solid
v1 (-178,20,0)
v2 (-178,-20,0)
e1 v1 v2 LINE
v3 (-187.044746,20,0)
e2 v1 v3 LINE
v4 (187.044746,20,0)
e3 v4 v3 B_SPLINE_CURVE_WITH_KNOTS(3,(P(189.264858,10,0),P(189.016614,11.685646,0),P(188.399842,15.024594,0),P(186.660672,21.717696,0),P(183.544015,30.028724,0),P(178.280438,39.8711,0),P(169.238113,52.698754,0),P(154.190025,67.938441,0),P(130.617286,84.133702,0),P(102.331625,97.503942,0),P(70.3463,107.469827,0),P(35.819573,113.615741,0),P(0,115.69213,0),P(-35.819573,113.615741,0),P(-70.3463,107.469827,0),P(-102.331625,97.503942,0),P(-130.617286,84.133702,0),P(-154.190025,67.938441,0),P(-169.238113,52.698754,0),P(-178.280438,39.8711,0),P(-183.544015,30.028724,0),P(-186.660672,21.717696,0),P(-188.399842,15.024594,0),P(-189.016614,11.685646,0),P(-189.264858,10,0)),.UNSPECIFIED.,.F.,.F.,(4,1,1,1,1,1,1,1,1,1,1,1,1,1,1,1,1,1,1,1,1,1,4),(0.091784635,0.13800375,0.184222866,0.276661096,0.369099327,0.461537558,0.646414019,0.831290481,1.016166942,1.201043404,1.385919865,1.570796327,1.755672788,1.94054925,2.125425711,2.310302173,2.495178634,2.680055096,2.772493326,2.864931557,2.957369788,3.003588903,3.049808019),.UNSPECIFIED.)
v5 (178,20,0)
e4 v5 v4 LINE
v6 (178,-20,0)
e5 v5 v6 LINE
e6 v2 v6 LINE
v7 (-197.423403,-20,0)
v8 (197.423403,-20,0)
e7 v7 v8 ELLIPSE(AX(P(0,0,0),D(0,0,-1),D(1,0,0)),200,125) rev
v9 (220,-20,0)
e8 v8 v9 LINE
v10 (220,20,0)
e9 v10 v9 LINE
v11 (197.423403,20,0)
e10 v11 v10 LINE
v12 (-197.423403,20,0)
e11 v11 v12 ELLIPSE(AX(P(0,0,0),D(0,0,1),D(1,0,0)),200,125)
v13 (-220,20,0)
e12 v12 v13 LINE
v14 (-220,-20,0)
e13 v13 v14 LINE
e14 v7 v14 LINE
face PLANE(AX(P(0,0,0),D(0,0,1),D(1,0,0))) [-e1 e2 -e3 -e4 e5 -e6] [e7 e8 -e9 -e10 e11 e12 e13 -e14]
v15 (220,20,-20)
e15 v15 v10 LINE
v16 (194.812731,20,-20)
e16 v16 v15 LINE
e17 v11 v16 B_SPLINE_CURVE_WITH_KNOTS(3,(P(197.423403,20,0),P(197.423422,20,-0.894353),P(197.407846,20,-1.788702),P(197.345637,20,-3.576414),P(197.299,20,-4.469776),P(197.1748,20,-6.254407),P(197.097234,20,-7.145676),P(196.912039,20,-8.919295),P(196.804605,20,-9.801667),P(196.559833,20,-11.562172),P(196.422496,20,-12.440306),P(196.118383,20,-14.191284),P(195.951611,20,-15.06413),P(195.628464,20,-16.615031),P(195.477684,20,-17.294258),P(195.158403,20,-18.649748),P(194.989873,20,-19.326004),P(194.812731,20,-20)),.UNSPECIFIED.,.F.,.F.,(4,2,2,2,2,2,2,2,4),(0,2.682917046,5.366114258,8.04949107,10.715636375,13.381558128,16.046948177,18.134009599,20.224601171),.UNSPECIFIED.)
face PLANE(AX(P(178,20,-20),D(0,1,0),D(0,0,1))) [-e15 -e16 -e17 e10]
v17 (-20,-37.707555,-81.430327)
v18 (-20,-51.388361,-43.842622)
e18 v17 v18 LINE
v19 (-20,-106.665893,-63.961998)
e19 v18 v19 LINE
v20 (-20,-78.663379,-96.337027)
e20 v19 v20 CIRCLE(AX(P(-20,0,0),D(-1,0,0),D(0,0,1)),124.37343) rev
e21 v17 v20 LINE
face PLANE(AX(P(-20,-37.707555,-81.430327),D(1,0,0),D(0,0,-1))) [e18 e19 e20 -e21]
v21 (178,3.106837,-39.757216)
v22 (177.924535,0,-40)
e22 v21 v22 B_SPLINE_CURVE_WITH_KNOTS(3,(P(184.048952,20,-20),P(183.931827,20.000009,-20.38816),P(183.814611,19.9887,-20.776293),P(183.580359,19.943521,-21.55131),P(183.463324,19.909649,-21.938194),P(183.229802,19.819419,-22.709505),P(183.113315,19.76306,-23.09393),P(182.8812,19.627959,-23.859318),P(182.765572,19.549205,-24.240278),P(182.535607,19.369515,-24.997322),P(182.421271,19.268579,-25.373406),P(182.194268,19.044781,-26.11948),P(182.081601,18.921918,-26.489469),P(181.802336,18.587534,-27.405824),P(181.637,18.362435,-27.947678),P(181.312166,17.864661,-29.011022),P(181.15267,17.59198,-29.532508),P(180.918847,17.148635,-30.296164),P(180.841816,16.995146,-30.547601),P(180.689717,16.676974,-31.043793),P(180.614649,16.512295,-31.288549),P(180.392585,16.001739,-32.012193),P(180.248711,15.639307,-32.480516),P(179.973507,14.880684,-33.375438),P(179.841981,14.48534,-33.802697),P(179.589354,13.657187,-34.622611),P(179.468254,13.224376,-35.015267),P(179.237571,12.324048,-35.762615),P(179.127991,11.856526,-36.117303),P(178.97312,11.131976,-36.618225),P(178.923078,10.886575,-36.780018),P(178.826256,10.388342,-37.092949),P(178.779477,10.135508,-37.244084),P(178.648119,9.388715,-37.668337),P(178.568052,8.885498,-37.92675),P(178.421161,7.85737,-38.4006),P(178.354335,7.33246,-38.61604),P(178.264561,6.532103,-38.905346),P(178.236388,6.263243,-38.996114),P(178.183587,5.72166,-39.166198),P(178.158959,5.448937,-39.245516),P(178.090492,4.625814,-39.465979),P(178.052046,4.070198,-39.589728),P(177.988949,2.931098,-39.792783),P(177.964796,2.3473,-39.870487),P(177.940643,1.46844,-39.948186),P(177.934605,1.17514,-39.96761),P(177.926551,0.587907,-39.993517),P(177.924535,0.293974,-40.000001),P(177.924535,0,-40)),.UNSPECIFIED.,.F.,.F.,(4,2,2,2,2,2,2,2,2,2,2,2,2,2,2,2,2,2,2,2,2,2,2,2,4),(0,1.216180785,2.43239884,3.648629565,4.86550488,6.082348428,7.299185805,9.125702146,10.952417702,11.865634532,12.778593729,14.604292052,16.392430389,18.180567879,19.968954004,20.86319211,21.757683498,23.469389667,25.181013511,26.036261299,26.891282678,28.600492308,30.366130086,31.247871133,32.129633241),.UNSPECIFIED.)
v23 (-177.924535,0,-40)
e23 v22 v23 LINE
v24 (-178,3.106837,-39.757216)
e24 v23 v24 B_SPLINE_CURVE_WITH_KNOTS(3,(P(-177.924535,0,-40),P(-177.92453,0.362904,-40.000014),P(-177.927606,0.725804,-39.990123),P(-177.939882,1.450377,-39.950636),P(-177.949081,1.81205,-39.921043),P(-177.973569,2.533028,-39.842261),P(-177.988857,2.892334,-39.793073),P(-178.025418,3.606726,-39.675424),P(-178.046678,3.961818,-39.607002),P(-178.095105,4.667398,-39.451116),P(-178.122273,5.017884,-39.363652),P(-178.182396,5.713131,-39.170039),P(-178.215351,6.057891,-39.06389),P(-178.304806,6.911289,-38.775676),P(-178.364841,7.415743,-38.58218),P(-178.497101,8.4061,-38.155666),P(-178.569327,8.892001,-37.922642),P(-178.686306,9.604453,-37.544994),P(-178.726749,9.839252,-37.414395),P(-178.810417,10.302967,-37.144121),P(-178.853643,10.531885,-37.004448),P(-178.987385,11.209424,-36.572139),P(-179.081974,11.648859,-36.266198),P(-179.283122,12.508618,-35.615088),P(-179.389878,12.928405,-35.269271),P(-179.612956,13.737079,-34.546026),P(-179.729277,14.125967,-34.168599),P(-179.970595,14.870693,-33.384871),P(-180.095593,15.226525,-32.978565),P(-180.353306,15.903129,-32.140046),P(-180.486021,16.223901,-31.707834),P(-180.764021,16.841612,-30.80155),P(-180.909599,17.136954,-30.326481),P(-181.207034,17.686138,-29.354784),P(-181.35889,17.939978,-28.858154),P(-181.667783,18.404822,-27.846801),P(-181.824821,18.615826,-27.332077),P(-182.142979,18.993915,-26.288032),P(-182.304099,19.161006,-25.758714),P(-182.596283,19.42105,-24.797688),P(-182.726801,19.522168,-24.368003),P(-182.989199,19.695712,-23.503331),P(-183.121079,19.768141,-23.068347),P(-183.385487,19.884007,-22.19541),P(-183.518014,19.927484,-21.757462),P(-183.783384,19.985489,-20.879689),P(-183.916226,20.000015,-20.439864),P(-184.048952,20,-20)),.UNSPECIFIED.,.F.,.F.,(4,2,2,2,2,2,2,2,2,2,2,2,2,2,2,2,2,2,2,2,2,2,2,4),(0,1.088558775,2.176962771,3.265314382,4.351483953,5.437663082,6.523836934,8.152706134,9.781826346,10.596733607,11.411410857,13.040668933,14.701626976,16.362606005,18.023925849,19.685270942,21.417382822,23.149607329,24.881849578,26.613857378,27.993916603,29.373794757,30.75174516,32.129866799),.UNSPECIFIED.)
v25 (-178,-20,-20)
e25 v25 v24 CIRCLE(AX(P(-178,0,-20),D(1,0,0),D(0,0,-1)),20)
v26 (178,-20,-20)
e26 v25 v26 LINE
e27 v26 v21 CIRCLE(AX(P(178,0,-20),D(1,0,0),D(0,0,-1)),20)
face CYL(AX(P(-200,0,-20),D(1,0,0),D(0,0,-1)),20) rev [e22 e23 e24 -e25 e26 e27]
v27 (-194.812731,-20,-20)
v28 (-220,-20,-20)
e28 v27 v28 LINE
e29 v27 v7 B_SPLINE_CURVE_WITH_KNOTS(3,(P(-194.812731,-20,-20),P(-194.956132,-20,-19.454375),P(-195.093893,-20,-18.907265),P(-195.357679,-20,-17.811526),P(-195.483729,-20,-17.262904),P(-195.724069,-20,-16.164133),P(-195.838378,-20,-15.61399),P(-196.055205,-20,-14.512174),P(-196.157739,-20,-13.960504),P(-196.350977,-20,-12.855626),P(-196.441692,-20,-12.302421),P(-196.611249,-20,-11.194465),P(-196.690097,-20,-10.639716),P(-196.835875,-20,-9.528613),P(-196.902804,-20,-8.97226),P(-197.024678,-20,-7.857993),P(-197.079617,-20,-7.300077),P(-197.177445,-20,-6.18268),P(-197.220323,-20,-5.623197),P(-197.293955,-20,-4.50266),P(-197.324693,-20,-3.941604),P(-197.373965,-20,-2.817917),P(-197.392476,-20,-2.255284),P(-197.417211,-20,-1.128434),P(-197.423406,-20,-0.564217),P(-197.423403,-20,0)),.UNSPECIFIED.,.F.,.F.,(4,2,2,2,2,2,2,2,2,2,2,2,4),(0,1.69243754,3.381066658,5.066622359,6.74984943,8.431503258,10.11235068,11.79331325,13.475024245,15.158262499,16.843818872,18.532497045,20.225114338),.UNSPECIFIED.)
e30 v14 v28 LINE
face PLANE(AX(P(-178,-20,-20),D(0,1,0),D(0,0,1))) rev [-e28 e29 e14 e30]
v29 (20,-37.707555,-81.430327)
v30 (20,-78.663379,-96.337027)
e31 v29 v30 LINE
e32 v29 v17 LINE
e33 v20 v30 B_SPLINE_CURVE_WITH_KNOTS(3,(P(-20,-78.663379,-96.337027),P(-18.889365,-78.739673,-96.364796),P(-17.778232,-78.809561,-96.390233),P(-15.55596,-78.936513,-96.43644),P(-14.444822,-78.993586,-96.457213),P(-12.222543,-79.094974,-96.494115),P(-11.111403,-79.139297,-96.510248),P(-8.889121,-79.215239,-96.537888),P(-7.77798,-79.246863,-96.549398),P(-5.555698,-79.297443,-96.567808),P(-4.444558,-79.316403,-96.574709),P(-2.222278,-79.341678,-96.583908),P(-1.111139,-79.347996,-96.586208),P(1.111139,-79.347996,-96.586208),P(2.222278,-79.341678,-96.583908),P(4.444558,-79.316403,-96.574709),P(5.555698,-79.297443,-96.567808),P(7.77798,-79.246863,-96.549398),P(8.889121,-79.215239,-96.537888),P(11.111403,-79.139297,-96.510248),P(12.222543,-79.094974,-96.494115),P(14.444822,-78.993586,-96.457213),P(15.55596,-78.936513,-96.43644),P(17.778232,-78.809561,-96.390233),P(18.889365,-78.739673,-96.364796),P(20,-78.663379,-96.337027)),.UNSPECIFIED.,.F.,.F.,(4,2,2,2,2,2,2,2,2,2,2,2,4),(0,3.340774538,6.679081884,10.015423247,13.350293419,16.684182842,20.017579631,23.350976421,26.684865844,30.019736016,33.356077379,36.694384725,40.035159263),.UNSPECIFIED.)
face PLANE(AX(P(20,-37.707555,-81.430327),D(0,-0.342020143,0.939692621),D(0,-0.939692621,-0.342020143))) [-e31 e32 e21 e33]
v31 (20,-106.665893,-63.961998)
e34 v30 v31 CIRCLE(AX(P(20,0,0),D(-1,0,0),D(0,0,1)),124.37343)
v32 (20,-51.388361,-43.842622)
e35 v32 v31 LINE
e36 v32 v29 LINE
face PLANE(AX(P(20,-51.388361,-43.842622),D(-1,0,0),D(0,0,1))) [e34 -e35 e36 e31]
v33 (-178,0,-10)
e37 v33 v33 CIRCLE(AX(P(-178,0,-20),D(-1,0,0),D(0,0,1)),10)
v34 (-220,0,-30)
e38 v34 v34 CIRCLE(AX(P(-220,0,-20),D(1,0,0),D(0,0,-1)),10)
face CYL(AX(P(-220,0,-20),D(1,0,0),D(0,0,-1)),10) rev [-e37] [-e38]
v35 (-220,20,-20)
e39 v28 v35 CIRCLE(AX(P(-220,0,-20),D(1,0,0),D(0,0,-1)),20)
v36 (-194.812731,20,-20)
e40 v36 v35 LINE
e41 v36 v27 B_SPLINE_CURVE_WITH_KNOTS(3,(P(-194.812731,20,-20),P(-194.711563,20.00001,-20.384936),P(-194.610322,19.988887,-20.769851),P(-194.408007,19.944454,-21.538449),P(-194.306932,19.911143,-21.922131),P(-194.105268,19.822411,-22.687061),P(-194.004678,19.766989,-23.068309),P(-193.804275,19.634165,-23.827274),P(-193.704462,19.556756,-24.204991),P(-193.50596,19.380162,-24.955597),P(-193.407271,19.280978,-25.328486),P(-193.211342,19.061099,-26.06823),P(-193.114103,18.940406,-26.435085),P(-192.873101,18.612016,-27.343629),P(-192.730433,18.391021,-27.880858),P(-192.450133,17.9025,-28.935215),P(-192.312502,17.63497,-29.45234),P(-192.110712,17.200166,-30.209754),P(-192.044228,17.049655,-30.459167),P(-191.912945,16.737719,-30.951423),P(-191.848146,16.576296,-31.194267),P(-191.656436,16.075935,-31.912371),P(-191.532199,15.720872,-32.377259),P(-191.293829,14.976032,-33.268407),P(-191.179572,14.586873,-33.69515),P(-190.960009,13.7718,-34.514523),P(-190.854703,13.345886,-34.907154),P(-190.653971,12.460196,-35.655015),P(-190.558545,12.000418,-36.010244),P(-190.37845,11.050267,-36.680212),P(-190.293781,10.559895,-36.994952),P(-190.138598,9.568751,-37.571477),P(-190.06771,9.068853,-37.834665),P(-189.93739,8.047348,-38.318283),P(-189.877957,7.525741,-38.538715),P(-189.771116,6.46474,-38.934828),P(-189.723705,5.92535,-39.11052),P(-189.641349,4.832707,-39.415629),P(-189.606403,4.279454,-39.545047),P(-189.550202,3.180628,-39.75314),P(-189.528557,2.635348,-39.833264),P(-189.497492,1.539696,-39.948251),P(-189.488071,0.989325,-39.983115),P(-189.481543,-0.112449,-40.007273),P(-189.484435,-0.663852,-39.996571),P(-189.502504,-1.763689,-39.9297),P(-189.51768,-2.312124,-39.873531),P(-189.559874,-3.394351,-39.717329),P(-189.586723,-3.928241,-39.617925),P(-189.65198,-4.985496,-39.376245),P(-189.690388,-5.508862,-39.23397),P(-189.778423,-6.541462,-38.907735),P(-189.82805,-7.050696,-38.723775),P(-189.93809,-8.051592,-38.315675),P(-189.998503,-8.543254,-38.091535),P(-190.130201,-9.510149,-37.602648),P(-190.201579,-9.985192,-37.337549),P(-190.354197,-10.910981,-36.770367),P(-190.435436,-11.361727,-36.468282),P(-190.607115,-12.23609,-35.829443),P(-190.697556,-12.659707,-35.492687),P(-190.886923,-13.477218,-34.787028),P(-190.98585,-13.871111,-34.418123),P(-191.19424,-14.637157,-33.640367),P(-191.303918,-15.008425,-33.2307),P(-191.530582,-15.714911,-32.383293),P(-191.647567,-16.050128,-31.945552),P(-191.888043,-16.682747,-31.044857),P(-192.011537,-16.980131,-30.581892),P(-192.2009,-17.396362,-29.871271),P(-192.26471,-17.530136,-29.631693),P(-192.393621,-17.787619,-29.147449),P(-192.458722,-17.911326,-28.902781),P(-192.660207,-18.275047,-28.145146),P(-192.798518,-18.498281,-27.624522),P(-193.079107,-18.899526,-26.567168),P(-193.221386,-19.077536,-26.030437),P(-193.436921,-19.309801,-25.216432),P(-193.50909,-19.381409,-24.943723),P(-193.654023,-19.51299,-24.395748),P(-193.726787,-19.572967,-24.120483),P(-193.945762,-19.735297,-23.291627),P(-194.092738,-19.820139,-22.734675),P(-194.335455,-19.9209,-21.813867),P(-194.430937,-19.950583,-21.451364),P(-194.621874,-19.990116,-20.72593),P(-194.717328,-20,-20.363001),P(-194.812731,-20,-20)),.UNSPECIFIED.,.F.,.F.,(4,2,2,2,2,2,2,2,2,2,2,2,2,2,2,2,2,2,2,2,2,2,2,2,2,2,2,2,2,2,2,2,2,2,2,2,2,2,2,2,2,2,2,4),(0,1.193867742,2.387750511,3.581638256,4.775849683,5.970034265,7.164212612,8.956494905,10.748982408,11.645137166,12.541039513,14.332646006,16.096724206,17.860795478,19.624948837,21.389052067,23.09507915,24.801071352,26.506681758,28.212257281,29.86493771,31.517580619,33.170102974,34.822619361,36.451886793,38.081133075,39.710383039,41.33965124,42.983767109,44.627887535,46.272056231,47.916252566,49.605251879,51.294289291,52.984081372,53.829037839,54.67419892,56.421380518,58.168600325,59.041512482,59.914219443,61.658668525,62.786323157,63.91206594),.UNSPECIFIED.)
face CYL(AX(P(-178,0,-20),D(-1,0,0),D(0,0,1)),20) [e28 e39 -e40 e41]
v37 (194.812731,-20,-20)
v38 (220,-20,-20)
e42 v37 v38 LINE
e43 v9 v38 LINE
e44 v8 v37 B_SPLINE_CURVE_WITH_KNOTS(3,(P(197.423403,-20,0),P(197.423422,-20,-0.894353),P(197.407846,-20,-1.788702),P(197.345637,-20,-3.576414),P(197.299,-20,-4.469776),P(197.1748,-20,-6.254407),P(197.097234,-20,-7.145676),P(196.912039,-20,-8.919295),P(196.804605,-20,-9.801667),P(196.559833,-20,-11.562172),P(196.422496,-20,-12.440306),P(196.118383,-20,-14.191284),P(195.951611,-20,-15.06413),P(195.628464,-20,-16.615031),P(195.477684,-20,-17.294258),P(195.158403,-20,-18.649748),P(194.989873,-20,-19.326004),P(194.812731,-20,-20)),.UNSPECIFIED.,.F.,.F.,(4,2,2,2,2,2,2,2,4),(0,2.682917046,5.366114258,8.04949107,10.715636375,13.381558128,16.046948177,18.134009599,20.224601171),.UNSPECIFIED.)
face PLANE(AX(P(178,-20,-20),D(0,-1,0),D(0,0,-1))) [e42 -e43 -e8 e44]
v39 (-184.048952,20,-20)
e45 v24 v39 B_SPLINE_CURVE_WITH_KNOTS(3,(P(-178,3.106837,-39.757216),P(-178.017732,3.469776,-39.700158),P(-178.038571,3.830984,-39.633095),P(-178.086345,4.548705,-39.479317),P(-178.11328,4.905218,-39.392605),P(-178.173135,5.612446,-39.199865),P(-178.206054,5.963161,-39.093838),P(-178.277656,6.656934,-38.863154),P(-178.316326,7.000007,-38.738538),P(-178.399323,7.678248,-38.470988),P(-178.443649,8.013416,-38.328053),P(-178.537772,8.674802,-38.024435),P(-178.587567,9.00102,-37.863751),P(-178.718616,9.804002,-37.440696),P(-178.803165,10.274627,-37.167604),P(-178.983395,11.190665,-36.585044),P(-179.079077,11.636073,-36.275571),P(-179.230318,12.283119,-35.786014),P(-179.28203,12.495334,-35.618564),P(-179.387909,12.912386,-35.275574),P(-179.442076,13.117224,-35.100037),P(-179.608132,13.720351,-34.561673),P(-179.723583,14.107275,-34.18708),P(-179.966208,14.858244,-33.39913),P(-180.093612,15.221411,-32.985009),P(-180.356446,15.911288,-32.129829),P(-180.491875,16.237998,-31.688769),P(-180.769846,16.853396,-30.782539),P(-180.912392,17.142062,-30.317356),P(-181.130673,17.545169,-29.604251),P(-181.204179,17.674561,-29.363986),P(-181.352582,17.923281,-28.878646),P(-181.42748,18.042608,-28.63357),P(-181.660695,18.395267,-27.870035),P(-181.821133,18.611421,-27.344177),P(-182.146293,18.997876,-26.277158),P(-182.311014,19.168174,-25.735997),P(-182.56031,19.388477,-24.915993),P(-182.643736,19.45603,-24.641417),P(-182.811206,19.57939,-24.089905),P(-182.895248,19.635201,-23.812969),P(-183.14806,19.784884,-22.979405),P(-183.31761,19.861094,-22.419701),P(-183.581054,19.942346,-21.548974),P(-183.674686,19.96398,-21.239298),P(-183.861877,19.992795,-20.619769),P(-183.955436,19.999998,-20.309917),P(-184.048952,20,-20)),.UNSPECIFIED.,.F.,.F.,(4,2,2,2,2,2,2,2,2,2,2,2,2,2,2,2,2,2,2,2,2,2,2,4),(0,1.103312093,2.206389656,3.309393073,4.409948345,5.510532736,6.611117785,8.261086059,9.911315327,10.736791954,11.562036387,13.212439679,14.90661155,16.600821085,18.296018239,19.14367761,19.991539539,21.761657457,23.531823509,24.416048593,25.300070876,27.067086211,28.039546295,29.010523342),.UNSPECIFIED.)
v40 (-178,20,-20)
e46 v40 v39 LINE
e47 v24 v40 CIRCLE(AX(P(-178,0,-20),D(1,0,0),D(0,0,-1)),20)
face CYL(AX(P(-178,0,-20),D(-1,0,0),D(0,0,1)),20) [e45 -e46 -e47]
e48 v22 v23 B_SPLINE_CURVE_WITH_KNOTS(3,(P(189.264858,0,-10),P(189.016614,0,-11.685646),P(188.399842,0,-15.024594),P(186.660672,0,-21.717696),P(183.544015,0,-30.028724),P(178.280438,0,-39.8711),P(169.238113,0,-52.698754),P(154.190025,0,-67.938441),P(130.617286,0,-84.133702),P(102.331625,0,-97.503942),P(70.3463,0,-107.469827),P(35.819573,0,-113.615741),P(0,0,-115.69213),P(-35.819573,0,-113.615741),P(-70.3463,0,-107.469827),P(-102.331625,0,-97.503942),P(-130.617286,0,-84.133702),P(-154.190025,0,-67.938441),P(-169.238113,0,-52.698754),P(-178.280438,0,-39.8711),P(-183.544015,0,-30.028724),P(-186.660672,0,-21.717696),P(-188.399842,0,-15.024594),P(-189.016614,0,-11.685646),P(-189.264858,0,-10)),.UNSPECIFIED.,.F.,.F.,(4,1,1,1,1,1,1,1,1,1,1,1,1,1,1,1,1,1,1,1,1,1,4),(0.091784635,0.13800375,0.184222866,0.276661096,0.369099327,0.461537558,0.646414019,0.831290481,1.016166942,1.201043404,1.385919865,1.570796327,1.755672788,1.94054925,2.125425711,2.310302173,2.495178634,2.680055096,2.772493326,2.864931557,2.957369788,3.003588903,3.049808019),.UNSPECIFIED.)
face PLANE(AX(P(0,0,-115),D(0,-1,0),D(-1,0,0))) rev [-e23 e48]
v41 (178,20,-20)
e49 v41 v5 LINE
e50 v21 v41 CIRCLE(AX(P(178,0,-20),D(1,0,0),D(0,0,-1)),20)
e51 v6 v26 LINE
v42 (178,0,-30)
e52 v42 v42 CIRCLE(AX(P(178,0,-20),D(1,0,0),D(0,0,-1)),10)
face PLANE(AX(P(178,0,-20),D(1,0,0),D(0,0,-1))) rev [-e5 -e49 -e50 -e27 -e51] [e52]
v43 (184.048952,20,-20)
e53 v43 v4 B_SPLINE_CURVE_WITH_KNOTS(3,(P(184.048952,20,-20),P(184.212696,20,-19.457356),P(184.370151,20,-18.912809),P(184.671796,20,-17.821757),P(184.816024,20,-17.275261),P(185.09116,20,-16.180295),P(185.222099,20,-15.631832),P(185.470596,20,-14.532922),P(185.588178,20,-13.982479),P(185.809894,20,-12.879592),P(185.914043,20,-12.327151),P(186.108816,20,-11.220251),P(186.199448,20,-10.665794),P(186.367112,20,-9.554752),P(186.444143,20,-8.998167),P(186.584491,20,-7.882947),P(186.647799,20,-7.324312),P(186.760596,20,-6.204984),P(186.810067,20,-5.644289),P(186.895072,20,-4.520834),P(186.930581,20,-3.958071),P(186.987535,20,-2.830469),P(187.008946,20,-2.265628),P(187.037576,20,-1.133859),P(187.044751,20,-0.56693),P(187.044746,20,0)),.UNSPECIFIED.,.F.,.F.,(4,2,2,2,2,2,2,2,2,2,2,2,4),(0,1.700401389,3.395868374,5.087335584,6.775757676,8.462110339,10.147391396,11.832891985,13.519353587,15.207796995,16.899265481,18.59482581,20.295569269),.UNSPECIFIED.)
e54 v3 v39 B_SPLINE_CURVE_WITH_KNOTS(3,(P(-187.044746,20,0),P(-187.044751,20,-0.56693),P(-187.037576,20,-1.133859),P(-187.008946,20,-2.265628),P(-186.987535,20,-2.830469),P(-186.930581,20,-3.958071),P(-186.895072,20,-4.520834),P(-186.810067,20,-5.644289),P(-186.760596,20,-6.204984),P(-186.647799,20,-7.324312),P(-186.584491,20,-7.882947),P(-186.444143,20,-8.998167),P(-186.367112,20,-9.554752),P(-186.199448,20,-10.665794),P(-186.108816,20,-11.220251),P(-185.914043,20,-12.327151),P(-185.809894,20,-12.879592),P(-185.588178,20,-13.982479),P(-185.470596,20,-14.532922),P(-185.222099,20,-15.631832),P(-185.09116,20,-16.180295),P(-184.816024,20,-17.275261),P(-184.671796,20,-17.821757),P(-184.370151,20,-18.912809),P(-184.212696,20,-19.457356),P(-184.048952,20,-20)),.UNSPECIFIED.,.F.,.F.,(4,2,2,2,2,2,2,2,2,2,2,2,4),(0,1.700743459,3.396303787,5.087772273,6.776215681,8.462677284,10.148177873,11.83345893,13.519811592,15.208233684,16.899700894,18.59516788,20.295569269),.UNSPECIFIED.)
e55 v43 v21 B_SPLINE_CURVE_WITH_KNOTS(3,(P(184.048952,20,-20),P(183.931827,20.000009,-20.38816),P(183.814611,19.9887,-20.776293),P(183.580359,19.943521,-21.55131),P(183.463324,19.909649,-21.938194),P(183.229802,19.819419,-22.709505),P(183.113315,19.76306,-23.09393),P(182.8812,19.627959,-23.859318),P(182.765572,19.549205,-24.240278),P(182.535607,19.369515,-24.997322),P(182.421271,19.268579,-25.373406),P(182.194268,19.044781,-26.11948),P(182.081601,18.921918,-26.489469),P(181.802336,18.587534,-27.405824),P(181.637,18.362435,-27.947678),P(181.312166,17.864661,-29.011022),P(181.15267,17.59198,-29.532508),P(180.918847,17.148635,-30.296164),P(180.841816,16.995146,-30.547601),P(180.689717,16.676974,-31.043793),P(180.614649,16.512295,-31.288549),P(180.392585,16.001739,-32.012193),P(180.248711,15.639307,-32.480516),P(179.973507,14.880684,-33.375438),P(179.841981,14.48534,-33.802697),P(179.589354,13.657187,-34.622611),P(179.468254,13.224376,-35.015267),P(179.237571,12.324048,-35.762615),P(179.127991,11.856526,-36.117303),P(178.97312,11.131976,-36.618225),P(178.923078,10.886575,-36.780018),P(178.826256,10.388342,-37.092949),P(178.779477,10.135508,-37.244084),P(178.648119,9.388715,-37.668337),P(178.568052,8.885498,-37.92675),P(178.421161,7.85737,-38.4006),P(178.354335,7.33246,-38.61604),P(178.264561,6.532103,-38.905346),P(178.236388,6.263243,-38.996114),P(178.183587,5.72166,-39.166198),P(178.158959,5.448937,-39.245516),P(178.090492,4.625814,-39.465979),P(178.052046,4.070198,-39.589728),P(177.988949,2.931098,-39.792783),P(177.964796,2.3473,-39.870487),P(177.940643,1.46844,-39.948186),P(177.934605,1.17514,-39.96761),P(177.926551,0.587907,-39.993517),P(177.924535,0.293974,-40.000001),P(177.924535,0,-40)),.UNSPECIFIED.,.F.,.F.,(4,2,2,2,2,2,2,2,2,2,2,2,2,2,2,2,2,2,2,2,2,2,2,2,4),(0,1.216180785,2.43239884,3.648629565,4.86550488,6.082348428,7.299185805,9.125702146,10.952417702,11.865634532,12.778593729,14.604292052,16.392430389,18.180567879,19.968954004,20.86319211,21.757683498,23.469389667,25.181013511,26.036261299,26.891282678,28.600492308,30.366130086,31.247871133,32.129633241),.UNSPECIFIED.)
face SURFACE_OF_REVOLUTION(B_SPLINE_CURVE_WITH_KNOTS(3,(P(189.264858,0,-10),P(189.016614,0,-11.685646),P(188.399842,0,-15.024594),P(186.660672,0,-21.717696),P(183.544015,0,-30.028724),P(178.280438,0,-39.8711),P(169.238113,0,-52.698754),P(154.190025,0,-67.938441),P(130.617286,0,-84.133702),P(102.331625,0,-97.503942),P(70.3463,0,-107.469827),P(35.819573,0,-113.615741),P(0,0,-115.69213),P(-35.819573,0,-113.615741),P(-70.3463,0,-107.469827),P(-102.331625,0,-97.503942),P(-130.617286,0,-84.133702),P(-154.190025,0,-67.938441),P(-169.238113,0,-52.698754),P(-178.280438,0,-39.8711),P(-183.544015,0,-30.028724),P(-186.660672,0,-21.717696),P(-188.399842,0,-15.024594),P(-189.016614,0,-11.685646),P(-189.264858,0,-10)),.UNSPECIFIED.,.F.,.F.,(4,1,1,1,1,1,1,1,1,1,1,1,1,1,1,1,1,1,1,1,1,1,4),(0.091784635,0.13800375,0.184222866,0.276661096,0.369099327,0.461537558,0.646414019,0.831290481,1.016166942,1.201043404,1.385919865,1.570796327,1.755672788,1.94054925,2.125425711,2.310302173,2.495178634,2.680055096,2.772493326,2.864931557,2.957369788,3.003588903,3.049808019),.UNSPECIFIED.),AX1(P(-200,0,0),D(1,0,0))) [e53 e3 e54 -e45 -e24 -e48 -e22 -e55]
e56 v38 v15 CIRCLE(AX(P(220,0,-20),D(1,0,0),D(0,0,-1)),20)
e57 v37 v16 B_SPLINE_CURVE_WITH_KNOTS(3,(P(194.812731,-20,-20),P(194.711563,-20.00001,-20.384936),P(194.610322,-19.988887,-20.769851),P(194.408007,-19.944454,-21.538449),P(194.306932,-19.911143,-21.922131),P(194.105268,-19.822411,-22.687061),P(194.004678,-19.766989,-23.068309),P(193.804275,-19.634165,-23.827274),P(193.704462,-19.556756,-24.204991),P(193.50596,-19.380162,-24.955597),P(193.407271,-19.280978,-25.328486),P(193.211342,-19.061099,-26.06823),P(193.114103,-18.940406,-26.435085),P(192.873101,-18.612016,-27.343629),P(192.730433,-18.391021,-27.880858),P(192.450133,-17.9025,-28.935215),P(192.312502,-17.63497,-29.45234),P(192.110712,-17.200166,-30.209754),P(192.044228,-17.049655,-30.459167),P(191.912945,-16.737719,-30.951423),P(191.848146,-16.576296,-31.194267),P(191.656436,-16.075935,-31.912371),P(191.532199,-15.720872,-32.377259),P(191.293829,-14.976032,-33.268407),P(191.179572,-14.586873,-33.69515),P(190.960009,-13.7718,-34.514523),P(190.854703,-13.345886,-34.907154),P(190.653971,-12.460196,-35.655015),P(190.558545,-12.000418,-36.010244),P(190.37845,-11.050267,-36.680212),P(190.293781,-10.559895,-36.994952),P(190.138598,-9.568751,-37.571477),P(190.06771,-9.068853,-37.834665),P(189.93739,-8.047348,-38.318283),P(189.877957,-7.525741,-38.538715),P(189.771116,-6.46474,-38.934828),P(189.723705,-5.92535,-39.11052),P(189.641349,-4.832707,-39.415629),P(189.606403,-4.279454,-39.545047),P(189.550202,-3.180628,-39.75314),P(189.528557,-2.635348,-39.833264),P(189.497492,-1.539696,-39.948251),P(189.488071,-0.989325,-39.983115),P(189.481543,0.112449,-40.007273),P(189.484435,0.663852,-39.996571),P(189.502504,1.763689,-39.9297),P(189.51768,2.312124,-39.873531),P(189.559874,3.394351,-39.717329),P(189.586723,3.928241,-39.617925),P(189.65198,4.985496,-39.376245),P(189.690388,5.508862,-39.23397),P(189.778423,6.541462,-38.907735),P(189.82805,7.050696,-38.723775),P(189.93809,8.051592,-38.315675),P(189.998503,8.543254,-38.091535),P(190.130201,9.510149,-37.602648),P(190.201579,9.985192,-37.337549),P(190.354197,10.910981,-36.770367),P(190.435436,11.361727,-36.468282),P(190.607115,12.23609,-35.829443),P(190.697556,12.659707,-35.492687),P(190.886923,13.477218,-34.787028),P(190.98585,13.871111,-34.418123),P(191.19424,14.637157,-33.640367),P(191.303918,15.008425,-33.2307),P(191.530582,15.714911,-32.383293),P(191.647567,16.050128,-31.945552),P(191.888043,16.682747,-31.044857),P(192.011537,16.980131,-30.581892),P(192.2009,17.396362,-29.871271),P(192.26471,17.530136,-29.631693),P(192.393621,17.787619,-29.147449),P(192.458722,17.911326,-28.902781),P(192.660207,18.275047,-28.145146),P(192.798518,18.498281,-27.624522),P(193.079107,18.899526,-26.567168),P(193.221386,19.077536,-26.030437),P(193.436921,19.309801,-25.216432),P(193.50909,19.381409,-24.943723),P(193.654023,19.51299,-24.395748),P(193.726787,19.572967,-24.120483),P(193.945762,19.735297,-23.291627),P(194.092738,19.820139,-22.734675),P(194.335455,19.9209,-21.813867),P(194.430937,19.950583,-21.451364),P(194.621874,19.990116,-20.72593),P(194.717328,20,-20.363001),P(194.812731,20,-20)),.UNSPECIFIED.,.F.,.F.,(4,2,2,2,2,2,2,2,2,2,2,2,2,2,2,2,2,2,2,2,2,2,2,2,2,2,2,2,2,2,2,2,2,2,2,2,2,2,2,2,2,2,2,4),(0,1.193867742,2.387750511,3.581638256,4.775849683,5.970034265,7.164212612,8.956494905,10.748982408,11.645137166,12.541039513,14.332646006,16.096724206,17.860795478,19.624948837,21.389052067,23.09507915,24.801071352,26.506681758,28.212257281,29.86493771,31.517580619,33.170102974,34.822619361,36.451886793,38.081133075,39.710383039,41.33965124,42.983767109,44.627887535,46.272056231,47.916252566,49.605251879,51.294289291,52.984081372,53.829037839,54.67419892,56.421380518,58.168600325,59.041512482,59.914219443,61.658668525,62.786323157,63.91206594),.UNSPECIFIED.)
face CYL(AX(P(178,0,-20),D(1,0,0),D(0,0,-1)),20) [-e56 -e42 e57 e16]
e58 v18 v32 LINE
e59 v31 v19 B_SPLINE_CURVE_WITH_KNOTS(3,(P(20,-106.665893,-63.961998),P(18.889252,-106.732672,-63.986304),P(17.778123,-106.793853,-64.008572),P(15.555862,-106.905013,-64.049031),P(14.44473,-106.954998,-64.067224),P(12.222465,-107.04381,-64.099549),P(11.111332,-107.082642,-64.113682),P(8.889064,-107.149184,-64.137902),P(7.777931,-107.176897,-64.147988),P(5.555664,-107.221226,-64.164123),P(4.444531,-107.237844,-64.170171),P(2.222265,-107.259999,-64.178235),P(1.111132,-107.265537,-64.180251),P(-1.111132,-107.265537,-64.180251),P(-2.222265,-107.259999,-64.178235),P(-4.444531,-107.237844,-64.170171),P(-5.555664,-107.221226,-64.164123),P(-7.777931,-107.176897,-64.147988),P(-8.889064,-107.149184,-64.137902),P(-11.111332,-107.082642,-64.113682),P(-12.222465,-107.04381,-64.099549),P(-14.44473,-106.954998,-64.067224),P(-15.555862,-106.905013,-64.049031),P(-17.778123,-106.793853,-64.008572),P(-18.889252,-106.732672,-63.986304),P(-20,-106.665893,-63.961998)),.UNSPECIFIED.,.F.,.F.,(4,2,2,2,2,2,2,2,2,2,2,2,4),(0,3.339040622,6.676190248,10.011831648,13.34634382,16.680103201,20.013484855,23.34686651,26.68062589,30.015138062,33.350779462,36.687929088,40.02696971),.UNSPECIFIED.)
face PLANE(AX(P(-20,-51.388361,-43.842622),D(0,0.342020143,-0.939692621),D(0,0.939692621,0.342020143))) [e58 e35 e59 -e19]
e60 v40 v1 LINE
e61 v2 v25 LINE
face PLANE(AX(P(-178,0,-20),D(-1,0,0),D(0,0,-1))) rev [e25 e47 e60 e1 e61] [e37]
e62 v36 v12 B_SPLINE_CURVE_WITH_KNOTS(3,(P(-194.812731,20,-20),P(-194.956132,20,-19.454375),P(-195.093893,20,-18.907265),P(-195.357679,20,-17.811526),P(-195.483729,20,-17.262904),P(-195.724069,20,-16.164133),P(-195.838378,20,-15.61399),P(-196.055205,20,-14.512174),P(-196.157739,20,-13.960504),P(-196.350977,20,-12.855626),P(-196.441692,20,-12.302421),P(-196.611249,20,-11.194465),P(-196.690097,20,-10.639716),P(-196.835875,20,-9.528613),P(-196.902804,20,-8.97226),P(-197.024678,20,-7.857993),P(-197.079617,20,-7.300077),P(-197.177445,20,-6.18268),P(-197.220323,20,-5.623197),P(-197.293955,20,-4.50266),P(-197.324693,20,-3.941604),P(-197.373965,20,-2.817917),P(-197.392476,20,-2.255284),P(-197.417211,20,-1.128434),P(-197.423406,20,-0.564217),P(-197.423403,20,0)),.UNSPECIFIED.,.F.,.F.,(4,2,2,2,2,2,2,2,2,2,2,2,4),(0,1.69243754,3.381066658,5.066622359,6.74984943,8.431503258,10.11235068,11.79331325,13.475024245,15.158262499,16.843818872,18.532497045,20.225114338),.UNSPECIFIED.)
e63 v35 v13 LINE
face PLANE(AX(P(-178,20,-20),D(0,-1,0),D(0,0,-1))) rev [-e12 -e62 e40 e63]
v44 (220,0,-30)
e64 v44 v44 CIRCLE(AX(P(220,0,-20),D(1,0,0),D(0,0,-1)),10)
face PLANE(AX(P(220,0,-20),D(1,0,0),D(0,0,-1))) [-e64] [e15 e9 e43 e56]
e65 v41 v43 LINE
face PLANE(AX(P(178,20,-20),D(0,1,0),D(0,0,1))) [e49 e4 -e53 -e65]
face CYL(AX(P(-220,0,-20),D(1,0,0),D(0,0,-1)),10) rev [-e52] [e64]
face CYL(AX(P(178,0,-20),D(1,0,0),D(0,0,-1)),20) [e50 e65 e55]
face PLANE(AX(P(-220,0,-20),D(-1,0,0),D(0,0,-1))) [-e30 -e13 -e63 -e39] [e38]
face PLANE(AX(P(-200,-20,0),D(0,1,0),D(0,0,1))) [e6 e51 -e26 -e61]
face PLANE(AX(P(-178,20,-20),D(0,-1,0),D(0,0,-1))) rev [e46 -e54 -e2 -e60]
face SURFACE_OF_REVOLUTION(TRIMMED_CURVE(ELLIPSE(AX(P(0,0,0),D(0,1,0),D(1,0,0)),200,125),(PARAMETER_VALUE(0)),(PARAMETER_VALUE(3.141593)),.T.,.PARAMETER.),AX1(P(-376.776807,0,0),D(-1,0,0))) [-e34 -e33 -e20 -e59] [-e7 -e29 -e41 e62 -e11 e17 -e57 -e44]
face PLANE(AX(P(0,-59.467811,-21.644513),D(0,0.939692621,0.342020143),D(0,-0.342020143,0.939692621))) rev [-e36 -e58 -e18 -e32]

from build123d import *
from build123d.topology import SkipClean

# Parameters (mm, degrees)
SKETCH_3_W          = 40
SKETCH_3_H          = 40
CUT_EXTRUDE_1_DEPTH = 70
CUT_REVOLVE_1_ANGLE = 90
CUT_EXTRUDE_2_DEPTH = 456.68629575
EXTRUDE_1_DEPTH     = 42
SKETCH_7_R          = 10
CUT_EXTRUDE_3_DEPTH = 440


with BuildPart() as part:
    # 草图1 → 旋转3 (revolve)
    with SkipClean():  # the faces are left unmerged after this step: merging them gives an invalid solid
        with BuildSketch(Plane(origin=(0, 0, 0), x_dir=(1, 0, 0), z_dir=(0, 1, 0))):
            with BuildLine():
                add(Edge.make_bspline(
                    [(200, 0), (200, 125), (0, 125), (-200, 125), (-200, 0)],
                    knots=[0, 0, 0, 1.570796327, 1.570796327, 3.141592654, 3.141592654, 3.141592654], degree=2, weights=[1, 0.707106781, 1, 0.707106781, 1]))
                Line((-200, 0), (200, 0))
            make_face()
            with BuildLine():
                Line((200, 0), (-200, 0))
                add(Edge.make_bspline(
                    [(-200, 0), (-200, -125), (0, -125), (200, -125), (200, 0)],
                    knots=[3.141592654, 3.141592654, 3.141592654, 4.71238898, 4.71238898, 6.283185307, 6.283185307, 6.283185307], degree=2, weights=[1, 0.707106781, 1, 0.707106781, 1]))
            make_face()
        revolve(axis=Axis((-376.776806715, 0, 0), (1, 0, 0)))
    add(part.part.scale(1), mode=Mode.REPLACE)  # the faces are merged on a copy

    # Surface Cut 1
    split(bisect_by=Plane.XY, keep=Keep.BOTTOM)

    # 草图3 → 切除-拉伸1 (cut)
    with BuildSketch(Plane(origin=(0, -125.246294878, -45.585923288), x_dir=(1, 0, 0), z_dir=(0, 0.9396926207859081, 0.34202014332566943))):
        with Locations((0, 43.622733675)):
            Rectangle(SKETCH_3_W, SKETCH_3_H)
    extrude(amount=CUT_EXTRUDE_1_DEPTH, mode=Mode.SUBTRACT)

    # 草图4 → 切除-旋转1 (revolve, cut)
    with BuildSketch(Plane.XY):
        with BuildLine():
            Line((-189.264857791, 10), (189.264857791, 10))
            add(Edge.make_bspline(
                [(189.264857791, 10), (189.01661408, 11.685645813), (188.399842232, 15.02459428), (186.660672029, 21.717695752), (183.544014825, 30.028723701), (178.280438028, 39.871100011), (169.238112825, 52.698753606), (154.190025082, 67.938441209), (130.617285564, 84.133702491), (102.331625356, 97.503941795), (70.346299789, 107.469826997), (35.819572857, 113.615740598), (0, 115.692129701), (-35.819572857, 113.615740598), (-70.346299789, 107.469826997), (-102.331625356, 97.503941795), (-130.617285564, 84.133702491), (-154.190025082, 67.938441209), (-169.238112825, 52.698753606), (-178.280438028, 39.871100011), (-183.544014825, 30.028723701), (-186.660672029, 21.717695752), (-188.399842232, 15.02459428), (-189.01661408, 11.685645813), (-189.264857791, 10)],
                knots=[0.091784635, 0.091784635, 0.091784635, 0.091784635, 0.13800375, 0.184222866, 0.276661096, 0.369099327, 0.461537558, 0.646414019, 0.831290481, 1.016166942, 1.201043404, 1.385919865, 1.570796327, 1.755672788, 1.94054925, 2.125425711, 2.310302173, 2.495178634, 2.680055096, 2.772493326, 2.864931557, 2.957369788, 3.003588903, 3.049808019, 3.049808019, 3.049808019, 3.049808019], degree=3))
        make_face()
    revolve(axis=Axis((-200, 0, 0), (-1, 0, 0)), revolution_arc=CUT_REVOLVE_1_ANGLE, mode=Mode.SUBTRACT)

    # 草图5 → 切除-拉伸2 (cut, through all)
    with BuildSketch(Plane(origin=(220, 0, 0), x_dir=(0, 0, -1), z_dir=(1, 0, 0))):
        with BuildLine():
            ThreePointArc((20, 20), (40, 0), (20, -20))
            Line((20, -20), (0, -20))
            Line((0, -20), (0, 20))
            Line((0, 20), (20, 20))
        make_face()
    extrude(amount=-CUT_EXTRUDE_2_DEPTH, mode=Mode.SUBTRACT)

    # 草图6 → 凸台-拉伸1 (add)
    with BuildSketch(Plane(origin=(220, 0, 0), x_dir=(0, 0, -1), z_dir=(1, 0, 0))):
        with BuildLine():
            Line((20, -20), (0, -20))
            Line((0, -20), (0, 20))
            Line((0, 20), (20, 20))
            ThreePointArc((20, 20), (40, 0), (20, -20))
        make_face()
    extrude_1 = extrude(amount=-EXTRUDE_1_DEPTH)

    # 镜向1: 凸台-拉伸1 across plane
    add(extrude_1.mirror(Plane(origin=(0, 0, 0), x_dir=(0, 0, 1), z_dir=(1, 0, 0))))

    # 草图7 → 切除-拉伸3 (cut)
    with BuildSketch(Plane(origin=(220, 0, 0), x_dir=(0, 0, -1), z_dir=(1, 0, 0))):
        with Locations((20, 0)):
            Circle(SKETCH_7_R)
    extrude(amount=-CUT_EXTRUDE_3_DEPTH, mode=Mode.SUBTRACT)


solid = part.part
